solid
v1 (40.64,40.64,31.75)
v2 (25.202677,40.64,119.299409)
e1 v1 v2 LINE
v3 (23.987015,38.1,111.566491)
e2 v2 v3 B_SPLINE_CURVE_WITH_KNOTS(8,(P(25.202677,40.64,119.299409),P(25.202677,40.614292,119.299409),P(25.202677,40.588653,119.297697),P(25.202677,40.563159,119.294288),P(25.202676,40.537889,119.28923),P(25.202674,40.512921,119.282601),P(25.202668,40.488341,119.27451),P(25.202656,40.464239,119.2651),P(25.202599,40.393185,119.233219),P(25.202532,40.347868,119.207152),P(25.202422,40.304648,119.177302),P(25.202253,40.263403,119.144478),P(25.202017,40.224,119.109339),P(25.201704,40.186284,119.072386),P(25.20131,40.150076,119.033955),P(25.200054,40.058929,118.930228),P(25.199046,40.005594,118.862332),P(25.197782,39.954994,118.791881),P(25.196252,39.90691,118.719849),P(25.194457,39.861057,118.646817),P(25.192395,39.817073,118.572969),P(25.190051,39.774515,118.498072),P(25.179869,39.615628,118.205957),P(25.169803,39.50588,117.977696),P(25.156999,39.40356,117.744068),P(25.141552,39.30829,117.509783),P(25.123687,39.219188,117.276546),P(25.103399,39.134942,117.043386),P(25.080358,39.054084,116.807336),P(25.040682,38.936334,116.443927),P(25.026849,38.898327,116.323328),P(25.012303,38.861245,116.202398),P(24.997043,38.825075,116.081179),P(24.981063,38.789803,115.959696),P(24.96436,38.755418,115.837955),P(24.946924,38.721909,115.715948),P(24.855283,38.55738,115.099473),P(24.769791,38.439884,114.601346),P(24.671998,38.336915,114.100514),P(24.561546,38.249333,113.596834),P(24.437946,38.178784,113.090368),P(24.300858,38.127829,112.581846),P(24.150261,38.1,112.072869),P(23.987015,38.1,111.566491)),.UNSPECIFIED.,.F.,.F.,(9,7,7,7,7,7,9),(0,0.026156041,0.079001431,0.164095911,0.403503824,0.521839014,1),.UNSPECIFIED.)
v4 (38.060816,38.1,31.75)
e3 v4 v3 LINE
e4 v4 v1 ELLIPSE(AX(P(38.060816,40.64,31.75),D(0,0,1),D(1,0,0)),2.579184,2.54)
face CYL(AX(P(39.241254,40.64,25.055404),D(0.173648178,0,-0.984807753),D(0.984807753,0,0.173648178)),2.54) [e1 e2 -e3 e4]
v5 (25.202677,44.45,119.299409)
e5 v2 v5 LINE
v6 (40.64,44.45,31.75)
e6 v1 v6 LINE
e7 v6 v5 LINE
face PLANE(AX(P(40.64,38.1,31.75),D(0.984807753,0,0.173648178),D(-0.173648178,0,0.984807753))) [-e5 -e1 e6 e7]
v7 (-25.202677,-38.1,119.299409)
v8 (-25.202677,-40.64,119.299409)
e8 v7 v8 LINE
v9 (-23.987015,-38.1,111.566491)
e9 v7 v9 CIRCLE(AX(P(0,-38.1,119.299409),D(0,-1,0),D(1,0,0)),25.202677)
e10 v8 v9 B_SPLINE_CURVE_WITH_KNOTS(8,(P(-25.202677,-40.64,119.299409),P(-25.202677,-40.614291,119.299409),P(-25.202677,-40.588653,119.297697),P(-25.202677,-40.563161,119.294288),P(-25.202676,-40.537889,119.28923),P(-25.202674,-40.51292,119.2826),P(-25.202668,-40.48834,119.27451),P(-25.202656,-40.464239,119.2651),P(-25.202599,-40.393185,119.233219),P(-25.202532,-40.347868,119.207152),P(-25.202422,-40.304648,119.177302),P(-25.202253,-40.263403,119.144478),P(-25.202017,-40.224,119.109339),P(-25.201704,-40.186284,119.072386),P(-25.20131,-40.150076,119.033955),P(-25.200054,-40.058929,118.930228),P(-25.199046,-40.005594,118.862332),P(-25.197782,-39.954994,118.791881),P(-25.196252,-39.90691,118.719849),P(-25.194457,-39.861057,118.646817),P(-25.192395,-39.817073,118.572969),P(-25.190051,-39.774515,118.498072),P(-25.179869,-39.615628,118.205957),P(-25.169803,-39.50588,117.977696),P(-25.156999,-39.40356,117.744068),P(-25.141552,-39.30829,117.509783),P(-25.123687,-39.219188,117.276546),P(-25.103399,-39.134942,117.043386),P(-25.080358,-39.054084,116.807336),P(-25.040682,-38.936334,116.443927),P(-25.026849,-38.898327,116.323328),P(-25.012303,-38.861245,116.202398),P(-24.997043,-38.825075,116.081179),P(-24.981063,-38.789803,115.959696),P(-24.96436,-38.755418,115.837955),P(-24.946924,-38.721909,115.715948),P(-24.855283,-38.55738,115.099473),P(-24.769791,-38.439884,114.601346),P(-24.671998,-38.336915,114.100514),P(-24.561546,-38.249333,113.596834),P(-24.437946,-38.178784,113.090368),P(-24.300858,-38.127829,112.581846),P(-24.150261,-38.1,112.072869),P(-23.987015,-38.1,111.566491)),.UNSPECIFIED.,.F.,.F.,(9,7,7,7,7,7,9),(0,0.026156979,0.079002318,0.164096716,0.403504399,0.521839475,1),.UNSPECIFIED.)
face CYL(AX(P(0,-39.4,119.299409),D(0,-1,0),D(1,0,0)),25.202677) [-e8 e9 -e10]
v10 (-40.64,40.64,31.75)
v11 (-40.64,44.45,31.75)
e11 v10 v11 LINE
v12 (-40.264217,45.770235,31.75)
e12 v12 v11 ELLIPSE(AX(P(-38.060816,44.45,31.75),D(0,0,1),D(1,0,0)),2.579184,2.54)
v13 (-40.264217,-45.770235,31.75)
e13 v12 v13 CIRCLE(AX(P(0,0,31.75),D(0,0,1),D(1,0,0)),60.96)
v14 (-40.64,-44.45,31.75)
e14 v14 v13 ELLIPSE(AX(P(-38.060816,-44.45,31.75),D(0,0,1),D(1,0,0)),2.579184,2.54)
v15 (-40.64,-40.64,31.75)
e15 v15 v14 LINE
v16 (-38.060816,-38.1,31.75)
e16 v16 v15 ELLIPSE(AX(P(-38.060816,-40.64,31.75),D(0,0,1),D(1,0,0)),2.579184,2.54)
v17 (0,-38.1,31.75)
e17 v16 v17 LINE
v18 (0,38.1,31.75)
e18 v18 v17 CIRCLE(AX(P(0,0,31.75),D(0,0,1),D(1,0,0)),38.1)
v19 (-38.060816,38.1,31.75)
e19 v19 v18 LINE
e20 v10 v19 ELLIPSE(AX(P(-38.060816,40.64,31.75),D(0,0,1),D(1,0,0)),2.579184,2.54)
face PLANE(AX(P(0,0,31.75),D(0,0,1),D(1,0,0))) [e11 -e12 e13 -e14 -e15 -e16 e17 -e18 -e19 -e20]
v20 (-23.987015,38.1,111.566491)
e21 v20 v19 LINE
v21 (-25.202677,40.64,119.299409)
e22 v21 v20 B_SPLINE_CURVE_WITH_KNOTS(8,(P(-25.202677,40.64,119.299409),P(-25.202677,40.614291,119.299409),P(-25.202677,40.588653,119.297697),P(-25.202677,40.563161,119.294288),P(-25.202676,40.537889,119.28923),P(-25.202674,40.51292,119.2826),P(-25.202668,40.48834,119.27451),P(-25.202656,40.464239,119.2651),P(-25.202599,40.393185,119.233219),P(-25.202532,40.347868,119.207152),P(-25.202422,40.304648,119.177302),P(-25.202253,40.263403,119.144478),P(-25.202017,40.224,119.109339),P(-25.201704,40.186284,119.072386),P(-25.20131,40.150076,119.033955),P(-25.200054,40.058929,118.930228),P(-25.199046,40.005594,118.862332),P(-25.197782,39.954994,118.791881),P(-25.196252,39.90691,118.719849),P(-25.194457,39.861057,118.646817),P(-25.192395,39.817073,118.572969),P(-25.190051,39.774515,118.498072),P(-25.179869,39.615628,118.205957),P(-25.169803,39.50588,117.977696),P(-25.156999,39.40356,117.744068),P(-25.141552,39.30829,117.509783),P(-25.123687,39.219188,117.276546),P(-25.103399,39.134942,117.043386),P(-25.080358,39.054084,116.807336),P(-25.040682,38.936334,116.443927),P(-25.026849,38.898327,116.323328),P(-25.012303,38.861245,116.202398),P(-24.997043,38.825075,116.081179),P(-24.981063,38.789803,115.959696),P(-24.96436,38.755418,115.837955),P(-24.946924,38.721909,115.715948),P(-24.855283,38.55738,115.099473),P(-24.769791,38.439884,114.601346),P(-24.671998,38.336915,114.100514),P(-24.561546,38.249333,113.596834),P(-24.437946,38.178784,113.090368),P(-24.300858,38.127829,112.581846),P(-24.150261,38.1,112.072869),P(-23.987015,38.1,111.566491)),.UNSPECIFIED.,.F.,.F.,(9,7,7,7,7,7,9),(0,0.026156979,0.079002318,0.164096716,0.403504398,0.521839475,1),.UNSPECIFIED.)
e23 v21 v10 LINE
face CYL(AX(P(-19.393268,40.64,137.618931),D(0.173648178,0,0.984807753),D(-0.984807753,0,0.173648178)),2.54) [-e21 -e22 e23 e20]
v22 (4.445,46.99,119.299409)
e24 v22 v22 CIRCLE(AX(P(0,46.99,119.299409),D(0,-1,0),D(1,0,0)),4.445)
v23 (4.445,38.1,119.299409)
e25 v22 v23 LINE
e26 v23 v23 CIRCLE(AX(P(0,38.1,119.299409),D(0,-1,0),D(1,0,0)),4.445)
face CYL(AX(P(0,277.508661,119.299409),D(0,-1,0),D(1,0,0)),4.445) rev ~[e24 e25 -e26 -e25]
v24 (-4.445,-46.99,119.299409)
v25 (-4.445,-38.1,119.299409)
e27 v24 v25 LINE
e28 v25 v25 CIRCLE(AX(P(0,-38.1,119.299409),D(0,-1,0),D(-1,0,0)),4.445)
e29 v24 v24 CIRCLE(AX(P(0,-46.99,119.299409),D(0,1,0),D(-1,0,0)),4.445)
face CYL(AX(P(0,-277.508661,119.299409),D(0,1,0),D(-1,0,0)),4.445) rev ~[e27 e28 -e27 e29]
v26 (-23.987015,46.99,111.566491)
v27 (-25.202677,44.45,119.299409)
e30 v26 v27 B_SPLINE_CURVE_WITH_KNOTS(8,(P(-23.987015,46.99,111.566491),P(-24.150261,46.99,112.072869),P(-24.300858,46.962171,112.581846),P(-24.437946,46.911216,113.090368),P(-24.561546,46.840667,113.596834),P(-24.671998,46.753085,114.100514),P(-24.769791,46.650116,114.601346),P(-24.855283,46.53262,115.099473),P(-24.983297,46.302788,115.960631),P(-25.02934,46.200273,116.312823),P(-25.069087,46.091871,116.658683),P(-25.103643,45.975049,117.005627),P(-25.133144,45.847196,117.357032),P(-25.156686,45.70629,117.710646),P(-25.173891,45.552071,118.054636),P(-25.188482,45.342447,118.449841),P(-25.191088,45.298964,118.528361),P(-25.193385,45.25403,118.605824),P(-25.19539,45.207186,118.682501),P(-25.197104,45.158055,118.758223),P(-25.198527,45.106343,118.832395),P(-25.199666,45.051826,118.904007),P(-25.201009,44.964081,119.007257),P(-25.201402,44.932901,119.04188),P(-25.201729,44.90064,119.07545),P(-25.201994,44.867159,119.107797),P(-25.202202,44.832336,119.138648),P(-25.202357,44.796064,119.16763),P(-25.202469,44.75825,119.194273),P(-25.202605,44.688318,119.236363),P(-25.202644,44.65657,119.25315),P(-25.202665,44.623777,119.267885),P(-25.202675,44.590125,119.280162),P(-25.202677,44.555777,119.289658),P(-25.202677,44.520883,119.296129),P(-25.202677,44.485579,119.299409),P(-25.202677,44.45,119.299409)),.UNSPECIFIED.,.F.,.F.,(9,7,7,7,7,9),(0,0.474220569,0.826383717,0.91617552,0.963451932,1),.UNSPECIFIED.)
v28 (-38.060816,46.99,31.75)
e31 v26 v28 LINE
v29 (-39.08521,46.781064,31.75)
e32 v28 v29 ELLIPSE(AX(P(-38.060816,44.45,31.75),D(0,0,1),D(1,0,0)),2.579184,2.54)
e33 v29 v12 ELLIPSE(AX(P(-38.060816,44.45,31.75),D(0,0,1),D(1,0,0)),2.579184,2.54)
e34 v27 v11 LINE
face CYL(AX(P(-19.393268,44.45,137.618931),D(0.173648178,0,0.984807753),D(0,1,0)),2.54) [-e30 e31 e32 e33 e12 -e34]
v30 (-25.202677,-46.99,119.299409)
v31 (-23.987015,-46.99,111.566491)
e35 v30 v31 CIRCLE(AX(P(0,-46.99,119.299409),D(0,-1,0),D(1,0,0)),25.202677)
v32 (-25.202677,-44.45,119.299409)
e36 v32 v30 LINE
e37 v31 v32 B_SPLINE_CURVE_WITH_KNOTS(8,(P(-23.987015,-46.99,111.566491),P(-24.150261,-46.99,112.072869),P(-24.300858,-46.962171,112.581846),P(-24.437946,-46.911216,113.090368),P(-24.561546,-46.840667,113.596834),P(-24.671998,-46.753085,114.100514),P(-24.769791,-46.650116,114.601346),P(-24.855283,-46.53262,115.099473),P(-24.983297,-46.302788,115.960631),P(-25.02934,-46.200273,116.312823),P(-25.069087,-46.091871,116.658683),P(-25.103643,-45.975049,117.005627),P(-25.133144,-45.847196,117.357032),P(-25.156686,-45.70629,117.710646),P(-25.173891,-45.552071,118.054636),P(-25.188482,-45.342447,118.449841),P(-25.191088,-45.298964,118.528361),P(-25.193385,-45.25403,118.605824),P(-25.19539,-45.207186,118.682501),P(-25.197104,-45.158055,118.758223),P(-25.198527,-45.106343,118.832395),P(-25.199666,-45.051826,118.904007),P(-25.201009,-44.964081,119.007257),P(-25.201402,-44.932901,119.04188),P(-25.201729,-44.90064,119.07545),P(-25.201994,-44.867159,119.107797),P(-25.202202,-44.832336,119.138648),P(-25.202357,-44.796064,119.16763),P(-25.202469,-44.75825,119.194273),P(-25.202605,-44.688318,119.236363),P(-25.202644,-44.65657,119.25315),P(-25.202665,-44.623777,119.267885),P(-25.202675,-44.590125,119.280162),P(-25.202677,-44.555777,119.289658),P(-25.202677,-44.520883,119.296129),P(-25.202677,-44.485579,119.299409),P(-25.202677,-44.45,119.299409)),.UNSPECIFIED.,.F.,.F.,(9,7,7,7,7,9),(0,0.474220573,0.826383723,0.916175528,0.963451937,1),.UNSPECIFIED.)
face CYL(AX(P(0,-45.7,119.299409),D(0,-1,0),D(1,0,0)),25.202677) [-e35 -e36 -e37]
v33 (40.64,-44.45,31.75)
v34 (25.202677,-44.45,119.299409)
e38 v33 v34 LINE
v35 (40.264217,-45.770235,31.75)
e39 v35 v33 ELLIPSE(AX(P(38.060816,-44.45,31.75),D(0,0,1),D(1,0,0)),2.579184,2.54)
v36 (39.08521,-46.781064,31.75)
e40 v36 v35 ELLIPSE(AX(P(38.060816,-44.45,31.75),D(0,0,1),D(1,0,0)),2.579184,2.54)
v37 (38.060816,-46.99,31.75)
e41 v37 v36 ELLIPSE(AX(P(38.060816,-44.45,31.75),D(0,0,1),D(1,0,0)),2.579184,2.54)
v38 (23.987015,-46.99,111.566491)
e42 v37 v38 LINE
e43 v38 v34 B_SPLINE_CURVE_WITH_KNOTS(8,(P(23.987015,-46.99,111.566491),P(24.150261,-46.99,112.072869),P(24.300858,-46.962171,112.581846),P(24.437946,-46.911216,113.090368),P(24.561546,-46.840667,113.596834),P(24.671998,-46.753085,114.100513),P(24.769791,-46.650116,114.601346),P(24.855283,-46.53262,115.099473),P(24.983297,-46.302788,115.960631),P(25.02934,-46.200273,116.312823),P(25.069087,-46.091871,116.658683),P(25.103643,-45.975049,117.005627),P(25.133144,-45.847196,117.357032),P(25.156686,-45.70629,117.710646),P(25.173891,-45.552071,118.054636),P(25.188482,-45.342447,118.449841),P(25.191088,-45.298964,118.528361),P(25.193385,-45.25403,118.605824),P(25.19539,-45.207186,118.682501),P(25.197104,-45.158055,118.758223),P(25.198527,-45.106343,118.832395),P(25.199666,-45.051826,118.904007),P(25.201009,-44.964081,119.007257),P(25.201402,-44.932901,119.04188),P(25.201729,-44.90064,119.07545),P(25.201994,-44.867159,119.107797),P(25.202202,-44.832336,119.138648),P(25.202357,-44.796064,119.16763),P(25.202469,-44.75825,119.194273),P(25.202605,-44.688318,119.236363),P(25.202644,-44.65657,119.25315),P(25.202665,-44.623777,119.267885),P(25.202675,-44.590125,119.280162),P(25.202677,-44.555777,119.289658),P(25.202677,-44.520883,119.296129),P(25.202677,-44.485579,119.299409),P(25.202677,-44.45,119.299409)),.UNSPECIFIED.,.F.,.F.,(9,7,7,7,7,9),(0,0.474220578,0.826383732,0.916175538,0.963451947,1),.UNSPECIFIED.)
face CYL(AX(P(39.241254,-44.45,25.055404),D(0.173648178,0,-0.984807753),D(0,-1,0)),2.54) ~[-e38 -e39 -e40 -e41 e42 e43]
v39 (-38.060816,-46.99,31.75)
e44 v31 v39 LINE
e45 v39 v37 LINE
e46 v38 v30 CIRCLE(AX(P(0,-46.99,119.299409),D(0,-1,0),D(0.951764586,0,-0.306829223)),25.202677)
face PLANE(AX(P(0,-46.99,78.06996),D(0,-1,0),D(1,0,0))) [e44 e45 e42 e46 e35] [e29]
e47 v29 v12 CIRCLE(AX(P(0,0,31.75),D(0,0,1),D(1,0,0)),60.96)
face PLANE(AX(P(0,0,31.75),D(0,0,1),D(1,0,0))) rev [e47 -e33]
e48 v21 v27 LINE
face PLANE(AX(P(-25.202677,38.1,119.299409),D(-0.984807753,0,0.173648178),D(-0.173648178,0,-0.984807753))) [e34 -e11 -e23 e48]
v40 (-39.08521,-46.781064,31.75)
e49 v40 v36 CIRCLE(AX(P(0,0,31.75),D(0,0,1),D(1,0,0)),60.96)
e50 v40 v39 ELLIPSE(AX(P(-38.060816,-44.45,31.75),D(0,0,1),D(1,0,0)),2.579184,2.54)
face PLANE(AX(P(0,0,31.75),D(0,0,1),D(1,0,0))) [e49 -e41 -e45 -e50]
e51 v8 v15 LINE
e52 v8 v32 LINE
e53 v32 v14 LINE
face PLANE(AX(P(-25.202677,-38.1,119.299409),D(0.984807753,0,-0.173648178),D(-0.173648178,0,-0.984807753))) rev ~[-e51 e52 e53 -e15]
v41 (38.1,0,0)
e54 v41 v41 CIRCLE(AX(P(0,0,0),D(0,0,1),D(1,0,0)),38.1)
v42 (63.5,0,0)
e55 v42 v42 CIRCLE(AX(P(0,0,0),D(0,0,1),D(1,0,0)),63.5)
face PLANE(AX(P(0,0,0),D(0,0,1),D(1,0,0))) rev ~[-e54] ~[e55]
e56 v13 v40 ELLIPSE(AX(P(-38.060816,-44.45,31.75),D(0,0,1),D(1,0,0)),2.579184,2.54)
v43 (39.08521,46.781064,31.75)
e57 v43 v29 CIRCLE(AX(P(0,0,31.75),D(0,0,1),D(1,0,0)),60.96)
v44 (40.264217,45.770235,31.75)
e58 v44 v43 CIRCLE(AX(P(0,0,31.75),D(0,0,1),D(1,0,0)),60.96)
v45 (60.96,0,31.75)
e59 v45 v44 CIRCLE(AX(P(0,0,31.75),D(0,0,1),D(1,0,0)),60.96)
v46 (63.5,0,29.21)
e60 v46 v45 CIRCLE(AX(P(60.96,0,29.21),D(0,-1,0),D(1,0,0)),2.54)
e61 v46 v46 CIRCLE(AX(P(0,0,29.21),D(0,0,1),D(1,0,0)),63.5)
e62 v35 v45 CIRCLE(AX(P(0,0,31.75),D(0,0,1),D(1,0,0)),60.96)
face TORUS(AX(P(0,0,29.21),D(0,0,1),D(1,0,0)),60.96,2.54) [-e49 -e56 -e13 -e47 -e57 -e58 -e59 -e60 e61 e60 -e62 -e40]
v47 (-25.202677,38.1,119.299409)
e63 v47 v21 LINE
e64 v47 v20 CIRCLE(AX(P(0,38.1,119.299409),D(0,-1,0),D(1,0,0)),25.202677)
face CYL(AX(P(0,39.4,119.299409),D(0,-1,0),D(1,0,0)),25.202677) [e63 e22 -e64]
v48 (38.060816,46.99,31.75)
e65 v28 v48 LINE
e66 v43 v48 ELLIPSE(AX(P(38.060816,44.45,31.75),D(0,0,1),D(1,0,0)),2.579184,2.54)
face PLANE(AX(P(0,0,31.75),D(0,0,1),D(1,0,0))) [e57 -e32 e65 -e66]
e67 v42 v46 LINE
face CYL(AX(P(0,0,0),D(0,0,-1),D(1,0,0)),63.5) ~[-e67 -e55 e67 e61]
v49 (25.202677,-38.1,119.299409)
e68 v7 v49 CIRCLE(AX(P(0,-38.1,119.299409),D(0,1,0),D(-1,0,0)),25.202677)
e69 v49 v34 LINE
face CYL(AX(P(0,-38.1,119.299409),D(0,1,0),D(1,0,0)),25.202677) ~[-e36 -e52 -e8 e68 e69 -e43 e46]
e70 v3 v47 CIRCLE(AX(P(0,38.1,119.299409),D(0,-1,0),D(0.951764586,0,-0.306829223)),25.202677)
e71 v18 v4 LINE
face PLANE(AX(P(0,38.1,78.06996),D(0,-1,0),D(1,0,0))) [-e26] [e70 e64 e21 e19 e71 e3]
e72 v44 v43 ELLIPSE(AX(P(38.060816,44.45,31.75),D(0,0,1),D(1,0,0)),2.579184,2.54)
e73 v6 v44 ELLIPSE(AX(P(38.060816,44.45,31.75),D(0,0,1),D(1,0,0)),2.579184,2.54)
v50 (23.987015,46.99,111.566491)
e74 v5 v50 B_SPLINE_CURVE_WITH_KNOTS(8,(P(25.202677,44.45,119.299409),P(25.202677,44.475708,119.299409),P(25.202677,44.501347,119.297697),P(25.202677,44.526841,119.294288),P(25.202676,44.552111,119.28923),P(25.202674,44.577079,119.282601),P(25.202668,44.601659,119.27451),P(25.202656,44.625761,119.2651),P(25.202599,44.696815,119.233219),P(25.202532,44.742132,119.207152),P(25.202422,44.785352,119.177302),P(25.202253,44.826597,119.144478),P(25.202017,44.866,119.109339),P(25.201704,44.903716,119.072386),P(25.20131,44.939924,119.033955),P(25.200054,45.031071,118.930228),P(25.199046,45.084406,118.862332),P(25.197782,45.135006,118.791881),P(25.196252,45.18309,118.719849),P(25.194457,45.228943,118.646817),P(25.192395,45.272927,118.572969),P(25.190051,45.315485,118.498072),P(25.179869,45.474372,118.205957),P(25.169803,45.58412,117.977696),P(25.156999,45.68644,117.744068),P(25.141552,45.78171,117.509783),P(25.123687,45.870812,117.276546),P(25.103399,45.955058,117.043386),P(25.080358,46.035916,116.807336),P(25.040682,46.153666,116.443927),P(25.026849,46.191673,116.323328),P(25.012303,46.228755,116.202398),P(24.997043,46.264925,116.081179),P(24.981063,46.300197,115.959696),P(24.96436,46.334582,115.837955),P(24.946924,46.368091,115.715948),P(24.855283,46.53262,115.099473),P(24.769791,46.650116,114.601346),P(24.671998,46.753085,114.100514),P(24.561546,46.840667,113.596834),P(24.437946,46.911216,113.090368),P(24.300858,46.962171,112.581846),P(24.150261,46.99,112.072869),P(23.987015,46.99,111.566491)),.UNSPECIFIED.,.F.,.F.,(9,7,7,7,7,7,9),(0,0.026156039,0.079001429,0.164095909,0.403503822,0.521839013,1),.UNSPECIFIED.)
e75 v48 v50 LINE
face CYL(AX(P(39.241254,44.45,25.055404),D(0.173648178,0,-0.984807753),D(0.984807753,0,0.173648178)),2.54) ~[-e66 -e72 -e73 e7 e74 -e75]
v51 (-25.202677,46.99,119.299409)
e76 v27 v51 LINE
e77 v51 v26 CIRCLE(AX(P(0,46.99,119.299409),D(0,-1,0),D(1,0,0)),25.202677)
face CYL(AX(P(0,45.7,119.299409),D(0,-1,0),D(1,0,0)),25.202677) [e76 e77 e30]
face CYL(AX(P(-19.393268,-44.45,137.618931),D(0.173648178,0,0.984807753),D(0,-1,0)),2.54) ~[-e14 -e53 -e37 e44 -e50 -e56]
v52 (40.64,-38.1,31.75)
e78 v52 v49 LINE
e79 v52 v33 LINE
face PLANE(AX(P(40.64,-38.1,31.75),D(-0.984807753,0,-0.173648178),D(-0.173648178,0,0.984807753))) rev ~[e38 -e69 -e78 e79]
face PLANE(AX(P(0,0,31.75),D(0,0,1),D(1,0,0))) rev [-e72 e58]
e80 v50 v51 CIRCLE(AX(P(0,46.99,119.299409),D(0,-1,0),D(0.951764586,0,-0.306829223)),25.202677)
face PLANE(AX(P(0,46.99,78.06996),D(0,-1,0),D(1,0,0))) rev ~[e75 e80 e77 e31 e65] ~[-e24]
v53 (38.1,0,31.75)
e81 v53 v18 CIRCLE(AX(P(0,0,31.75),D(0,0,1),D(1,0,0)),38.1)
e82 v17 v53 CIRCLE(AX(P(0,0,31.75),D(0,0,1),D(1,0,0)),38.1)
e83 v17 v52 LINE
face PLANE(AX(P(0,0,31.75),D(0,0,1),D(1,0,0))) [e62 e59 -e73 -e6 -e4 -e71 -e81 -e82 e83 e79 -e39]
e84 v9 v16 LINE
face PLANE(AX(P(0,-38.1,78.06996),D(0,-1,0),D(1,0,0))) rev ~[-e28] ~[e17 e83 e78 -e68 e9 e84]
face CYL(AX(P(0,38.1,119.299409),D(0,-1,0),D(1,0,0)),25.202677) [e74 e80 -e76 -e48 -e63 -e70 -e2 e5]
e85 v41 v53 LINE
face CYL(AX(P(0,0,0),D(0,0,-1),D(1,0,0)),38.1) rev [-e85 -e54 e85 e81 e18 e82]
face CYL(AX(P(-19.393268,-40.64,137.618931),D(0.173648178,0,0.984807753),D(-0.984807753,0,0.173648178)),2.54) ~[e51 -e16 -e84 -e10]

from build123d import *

# Parameters (mm, degrees)
F0_R          = 63.5
F0_R_2        = 38.1
F1_DEPTH      = 31.75
F4_DEPTH      = 8.89
F9_D          = 8.89
F11_DEPTH     = 8.89
F13_D         = 8.89
F14_T4_DEPTH  = 114.3
F14_S6_R      = 25.2026770054
F14_T7_DEPTH  = 59
F14_T11_DEPTH = 114.3
F14_S13_R     = 25.2026770054
F14_T14_DEPTH = 59
F14_T18_DEPTH = 114.3
F14_S20_R     = 25.2026770054
F14_T21_DEPTH = 59
F14_T25_DEPTH = 114.3
F14_S27_R     = 25.2026770054
F14_T28_DEPTH = 59
F14_T32_DEPTH = 114.3
F14_S34_R     = 25.2026770054
F14_T35_DEPTH = 59
F14_T39_DEPTH = 114.3
F14_S41_R     = 25.2026770054
F14_T42_DEPTH = 59
F14_T46_DEPTH = 114.3
F14_S48_R     = 25.2026770054
F14_T49_DEPTH = 59
F14_S54_R     = 2.54
F14_T55_DEPTH = 99
F14_S56_R     = 2.54
F14_T57_DEPTH = 99


# Not quite as in the source:
# - a fillet or chamfer that OpenCascade refuses, or shapes differently, is made with other operations: its cross-section is extruded or revolved along the edge and cut away or added
# - a feature of the source that left no trace in its solid (it failed there, or was rolled back) is left out


with BuildPart() as f1:
    # F0 (on Top) → F1 (new body)
    with BuildSketch(Plane.XY):
        Circle(F0_R)
        Circle(F0_R_2, mode=Mode.SUBTRACT)
    extrude(amount=F1_DEPTH)

    # F3 (on offset) → F4 (join)
    with BuildSketch(Plane.XZ.offset(38.1)):
        with BuildLine():
            Line((-25.2026770054, 119.2994092428), (-40.64, 31.75))
            Line((-40.64, 31.75), (40.64, 31.75))
            Line((40.64, 31.75), (25.2026770054, 119.2994092428))
            ThreePointArc((25.2026770054, 119.2994092428), (0, 144.5020862482), (-25.2026770054, 119.2994092428))
        make_face()
    extrude(amount=F4_DEPTH)

    # F9 (through all)
    with Locations(Plane.XZ.offset(46.99)):
        with Locations((0, 119.2994092428)):
            Hole(F9_D / 2)

    # F6 (on offset) → F11 (join)
    with BuildSketch(Plane.XZ.offset(-38.1)):
        with BuildLine():
            Line((-25.2026770054, 119.2994092428), (-40.64, 31.75))
            Line((-40.64, 31.75), (40.64, 31.75))
            Line((40.64, 31.75), (25.2026770054, 119.2994092428))
            ThreePointArc((25.2026770054, 119.2994092428), (0, 144.5020862482), (-25.2026770054, 119.2994092428))
        make_face()
    extrude(amount=-F11_DEPTH)

    # F13 (through all)
    with Locations(Plane(origin=(0, 46.99, 0), x_dir=(-1, 0, 0), z_dir=(0, 1, 0))):
        with Locations((0, 119.2994092428)):
            Hole(F13_D / 2)

    # F14: fillet of radius 2.54 on 8 edges, made by hand


with BuildPart() as f14_tool2:
    # F14_s3 → F14_t4 (new body)
    with BuildSketch(Plane(origin=(22.9494446088, 0, 130.1527679803), x_dir=(0, 1, 0), z_dir=(-0.1736481777, 0, -0.984807753))):
        with BuildLine():
            ThreePointArc((-46.99, -42.9959167233), (-46.2460512242, -44.7919679476), (-44.45, -45.5359167233))
            Line((-44.45, -45.5359167233), (-46.99, -45.5359167233))
            Line((-46.99, -45.5359167233), (-46.99, -42.9959167233))
        make_face()
    extrude(amount=F14_T4_DEPTH)

    split(bisect_by=Plane.XY.offset(31.75), keep=Keep.TOP)

    # F14_s6 → F14_t7 (cut, symmetric)
    with BuildSketch(Plane.XZ.offset(45.7)):
        with Locations((0, 119.2994092428)):
            Circle(F14_S6_R)
    extrude(amount=F14_T7_DEPTH, both=True, mode=Mode.SUBTRACT)


with BuildPart() as f1_1:
    add(f1.part)

    # F14_t1: cut F14_tool2
    add(f14_tool2.part, mode=Mode.SUBTRACT)


with BuildPart() as f14_tool9:
    # F14_s10 → F14_t11 (new body)
    with BuildSketch(Plane(origin=(-3.1014579015, 0, 17.589241811), x_dir=(0, 1, 0), z_dir=(-0.1736481777, 0, 0.984807753))):
        with BuildLine():
            ThreePointArc((-46.99, -42.9959167233), (-46.2460512242, -44.7919679476), (-44.45, -45.5359167233))
            Line((-44.45, -45.5359167233), (-46.99, -45.5359167233))
            Line((-46.99, -45.5359167233), (-46.99, -42.9959167233))
        make_face()
    extrude(amount=F14_T11_DEPTH)

    split(bisect_by=Plane.XY.offset(31.75), keep=Keep.TOP)

    # F14_s13 → F14_t14 (cut, symmetric)
    with BuildSketch(Plane.XZ.offset(45.7)):
        with Locations((0, 119.2994092428)):
            Circle(F14_S13_R)
    extrude(amount=F14_T14_DEPTH, both=True, mode=Mode.SUBTRACT)


with BuildPart() as f1_2:
    add(f1_1.part)

    # F14_t8: cut F14_tool9
    add(f14_tool9.part, mode=Mode.SUBTRACT)


with BuildPart() as f14_tool16:
    # F14_s17 → F14_t18 (new body)
    with BuildSketch(Plane(origin=(22.9494446088, 0, 130.1527679803), x_dir=(0, 1, 0), z_dir=(-0.1736481777, 0, -0.984807753))):
        with BuildLine():
            ThreePointArc((-40.64, -45.5359167233), (-38.8439487758, -44.7919679476), (-38.1, -42.9959167233))
            Line((-38.1, -42.9959167233), (-38.1, -45.5359167233))
            Line((-38.1, -45.5359167233), (-40.64, -45.5359167233))
        make_face()
    extrude(amount=F14_T18_DEPTH)

    split(bisect_by=Plane.XY.offset(31.75), keep=Keep.TOP)

    # F14_s20 → F14_t21 (cut, symmetric)
    with BuildSketch(Plane.XZ.offset(39.4)):
        with Locations((0, 119.2994092428)):
            Circle(F14_S20_R)
    extrude(amount=F14_T21_DEPTH, both=True, mode=Mode.SUBTRACT)


with BuildPart() as f1_3:
    add(f1_2.part)

    # F14_t15: cut F14_tool16
    add(f14_tool16.part, mode=Mode.SUBTRACT)


with BuildPart() as f14_tool23:
    # F14_s24 → F14_t25 (new body)
    with BuildSketch(Plane(origin=(-3.1014579015, 0, 17.589241811), x_dir=(0, 1, 0), z_dir=(-0.1736481777, 0, 0.984807753))):
        with BuildLine():
            ThreePointArc((40.64, -45.5359167233), (38.8439487758, -44.7919679476), (38.1, -42.9959167233))
            Line((38.1, -42.9959167233), (38.1, -45.5359167233))
            Line((38.1, -45.5359167233), (40.64, -45.5359167233))
        make_face()
    extrude(amount=F14_T25_DEPTH)

    split(bisect_by=Plane.XY.offset(31.75), keep=Keep.TOP)

    # F14_s27 → F14_t28 (cut, symmetric)
    with BuildSketch(Plane.XZ.offset(-39.4)):
        with Locations((0, 119.2994092428)):
            Circle(F14_S27_R)
    extrude(amount=F14_T28_DEPTH, both=True, mode=Mode.SUBTRACT)


with BuildPart() as f1_4:
    add(f1_3.part)

    # F14_t22: cut F14_tool23
    add(f14_tool23.part, mode=Mode.SUBTRACT)


with BuildPart() as f14_tool30:
    # F14_s31 → F14_t32 (new body)
    with BuildSketch(Plane(origin=(-3.1014579015, 0, 17.589241811), x_dir=(0, 1, 0), z_dir=(-0.1736481777, 0, 0.984807753))):
        with BuildLine():
            ThreePointArc((44.45, -45.5359167233), (46.2460512242, -44.7919679476), (46.99, -42.9959167233))
            Line((46.99, -42.9959167233), (46.99, -45.5359167233))
            Line((46.99, -45.5359167233), (44.45, -45.5359167233))
        make_face()
    extrude(amount=F14_T32_DEPTH)

    split(bisect_by=Plane.XY.offset(31.75), keep=Keep.TOP)

    # F14_s34 → F14_t35 (cut, symmetric)
    with BuildSketch(Plane.XZ.offset(-45.7)):
        with Locations((0, 119.2994092428)):
            Circle(F14_S34_R)
    extrude(amount=F14_T35_DEPTH, both=True, mode=Mode.SUBTRACT)


with BuildPart() as f1_5:
    add(f1_4.part)

    # F14_t29: cut F14_tool30
    add(f14_tool30.part, mode=Mode.SUBTRACT)


with BuildPart() as f14_tool37:
    # F14_s38 → F14_t39 (new body)
    with BuildSketch(Plane(origin=(22.9494446088, 0, 130.1527679803), x_dir=(0, 1, 0), z_dir=(-0.1736481777, 0, -0.984807753))):
        with BuildLine():
            ThreePointArc((46.99, -42.9959167233), (46.2460512242, -44.7919679476), (44.45, -45.5359167233))
            Line((44.45, -45.5359167233), (46.99, -45.5359167233))
            Line((46.99, -45.5359167233), (46.99, -42.9959167233))
        make_face()
    extrude(amount=F14_T39_DEPTH)

    split(bisect_by=Plane.XY.offset(31.75), keep=Keep.TOP)

    # F14_s41 → F14_t42 (cut, symmetric)
    with BuildSketch(Plane.XZ.offset(-45.7)):
        with Locations((0, 119.2994092428)):
            Circle(F14_S41_R)
    extrude(amount=F14_T42_DEPTH, both=True, mode=Mode.SUBTRACT)


with BuildPart() as f1_6:
    add(f1_5.part)

    # F14_t36: cut F14_tool37
    add(f14_tool37.part, mode=Mode.SUBTRACT)


with BuildPart() as f14_tool44:
    # F14_s45 → F14_t46 (new body)
    with BuildSketch(Plane(origin=(22.9494446088, 0, 130.1527679803), x_dir=(0, 1, 0), z_dir=(-0.1736481777, 0, -0.984807753))):
        with BuildLine():
            ThreePointArc((40.64, -45.5359167233), (38.8439487758, -44.7919679476), (38.1, -42.9959167233))
            Line((38.1, -42.9959167233), (38.1, -45.5359167233))
            Line((38.1, -45.5359167233), (40.64, -45.5359167233))
        make_face()
    extrude(amount=F14_T46_DEPTH)

    split(bisect_by=Plane.XY.offset(31.75), keep=Keep.TOP)

    # F14_s48 → F14_t49 (cut, symmetric)
    with BuildSketch(Plane.XZ.offset(-39.4)):
        with Locations((0, 119.2994092428)):
            Circle(F14_S48_R)
    extrude(amount=F14_T49_DEPTH, both=True, mode=Mode.SUBTRACT)


with BuildPart() as f1_7:
    add(f1_6.part)

    # F14_t43: cut F14_tool44
    add(f14_tool44.part, mode=Mode.SUBTRACT)


with BuildPart() as f14_tool51:
    # F14_s52 → F14_t53 (revolve)
    with BuildSketch(Plane.XZ):
        with BuildLine():
            ThreePointArc((63.5, 29.21), (62.7560512242, 31.0060512242), (60.96, 31.75))
            Line((60.96, 31.75), (63.5, 31.75))
            Line((63.5, 31.75), (63.5, 29.21))
        make_face()
    revolve(axis=Axis((0, 0, 31.75), (0, 0, 1)))

    # F14_s54 → F14_t55 (cut, symmetric)
    with BuildSketch(Plane(origin=(5.20944533, 0, 29.5442325904), x_dir=(0, 1, 0), z_dir=(0.1736481777, 0, 0.984807753))):
        with Locations((-44.45, 42.9959167233)):
            Circle(F14_S54_R)
    extrude(amount=F14_T55_DEPTH, both=True, mode=Mode.SUBTRACT)

    # F14_s56 → F14_t57 (cut, symmetric)
    with BuildSketch(Plane(origin=(-5.20944533, 0, 29.5442325904), x_dir=(0, 1, 0), z_dir=(0.1736481777, 0, -0.984807753))):
        with Locations((-44.45, 42.9959167233)):
            Circle(F14_S56_R)
    extrude(amount=F14_T57_DEPTH, both=True, mode=Mode.SUBTRACT)


with BuildPart() as f1_8:
    add(f1_7.part)

    # F14_t50: cut F14_tool51
    add(f14_tool51.part, mode=Mode.SUBTRACT)


solid = f1_8.part
